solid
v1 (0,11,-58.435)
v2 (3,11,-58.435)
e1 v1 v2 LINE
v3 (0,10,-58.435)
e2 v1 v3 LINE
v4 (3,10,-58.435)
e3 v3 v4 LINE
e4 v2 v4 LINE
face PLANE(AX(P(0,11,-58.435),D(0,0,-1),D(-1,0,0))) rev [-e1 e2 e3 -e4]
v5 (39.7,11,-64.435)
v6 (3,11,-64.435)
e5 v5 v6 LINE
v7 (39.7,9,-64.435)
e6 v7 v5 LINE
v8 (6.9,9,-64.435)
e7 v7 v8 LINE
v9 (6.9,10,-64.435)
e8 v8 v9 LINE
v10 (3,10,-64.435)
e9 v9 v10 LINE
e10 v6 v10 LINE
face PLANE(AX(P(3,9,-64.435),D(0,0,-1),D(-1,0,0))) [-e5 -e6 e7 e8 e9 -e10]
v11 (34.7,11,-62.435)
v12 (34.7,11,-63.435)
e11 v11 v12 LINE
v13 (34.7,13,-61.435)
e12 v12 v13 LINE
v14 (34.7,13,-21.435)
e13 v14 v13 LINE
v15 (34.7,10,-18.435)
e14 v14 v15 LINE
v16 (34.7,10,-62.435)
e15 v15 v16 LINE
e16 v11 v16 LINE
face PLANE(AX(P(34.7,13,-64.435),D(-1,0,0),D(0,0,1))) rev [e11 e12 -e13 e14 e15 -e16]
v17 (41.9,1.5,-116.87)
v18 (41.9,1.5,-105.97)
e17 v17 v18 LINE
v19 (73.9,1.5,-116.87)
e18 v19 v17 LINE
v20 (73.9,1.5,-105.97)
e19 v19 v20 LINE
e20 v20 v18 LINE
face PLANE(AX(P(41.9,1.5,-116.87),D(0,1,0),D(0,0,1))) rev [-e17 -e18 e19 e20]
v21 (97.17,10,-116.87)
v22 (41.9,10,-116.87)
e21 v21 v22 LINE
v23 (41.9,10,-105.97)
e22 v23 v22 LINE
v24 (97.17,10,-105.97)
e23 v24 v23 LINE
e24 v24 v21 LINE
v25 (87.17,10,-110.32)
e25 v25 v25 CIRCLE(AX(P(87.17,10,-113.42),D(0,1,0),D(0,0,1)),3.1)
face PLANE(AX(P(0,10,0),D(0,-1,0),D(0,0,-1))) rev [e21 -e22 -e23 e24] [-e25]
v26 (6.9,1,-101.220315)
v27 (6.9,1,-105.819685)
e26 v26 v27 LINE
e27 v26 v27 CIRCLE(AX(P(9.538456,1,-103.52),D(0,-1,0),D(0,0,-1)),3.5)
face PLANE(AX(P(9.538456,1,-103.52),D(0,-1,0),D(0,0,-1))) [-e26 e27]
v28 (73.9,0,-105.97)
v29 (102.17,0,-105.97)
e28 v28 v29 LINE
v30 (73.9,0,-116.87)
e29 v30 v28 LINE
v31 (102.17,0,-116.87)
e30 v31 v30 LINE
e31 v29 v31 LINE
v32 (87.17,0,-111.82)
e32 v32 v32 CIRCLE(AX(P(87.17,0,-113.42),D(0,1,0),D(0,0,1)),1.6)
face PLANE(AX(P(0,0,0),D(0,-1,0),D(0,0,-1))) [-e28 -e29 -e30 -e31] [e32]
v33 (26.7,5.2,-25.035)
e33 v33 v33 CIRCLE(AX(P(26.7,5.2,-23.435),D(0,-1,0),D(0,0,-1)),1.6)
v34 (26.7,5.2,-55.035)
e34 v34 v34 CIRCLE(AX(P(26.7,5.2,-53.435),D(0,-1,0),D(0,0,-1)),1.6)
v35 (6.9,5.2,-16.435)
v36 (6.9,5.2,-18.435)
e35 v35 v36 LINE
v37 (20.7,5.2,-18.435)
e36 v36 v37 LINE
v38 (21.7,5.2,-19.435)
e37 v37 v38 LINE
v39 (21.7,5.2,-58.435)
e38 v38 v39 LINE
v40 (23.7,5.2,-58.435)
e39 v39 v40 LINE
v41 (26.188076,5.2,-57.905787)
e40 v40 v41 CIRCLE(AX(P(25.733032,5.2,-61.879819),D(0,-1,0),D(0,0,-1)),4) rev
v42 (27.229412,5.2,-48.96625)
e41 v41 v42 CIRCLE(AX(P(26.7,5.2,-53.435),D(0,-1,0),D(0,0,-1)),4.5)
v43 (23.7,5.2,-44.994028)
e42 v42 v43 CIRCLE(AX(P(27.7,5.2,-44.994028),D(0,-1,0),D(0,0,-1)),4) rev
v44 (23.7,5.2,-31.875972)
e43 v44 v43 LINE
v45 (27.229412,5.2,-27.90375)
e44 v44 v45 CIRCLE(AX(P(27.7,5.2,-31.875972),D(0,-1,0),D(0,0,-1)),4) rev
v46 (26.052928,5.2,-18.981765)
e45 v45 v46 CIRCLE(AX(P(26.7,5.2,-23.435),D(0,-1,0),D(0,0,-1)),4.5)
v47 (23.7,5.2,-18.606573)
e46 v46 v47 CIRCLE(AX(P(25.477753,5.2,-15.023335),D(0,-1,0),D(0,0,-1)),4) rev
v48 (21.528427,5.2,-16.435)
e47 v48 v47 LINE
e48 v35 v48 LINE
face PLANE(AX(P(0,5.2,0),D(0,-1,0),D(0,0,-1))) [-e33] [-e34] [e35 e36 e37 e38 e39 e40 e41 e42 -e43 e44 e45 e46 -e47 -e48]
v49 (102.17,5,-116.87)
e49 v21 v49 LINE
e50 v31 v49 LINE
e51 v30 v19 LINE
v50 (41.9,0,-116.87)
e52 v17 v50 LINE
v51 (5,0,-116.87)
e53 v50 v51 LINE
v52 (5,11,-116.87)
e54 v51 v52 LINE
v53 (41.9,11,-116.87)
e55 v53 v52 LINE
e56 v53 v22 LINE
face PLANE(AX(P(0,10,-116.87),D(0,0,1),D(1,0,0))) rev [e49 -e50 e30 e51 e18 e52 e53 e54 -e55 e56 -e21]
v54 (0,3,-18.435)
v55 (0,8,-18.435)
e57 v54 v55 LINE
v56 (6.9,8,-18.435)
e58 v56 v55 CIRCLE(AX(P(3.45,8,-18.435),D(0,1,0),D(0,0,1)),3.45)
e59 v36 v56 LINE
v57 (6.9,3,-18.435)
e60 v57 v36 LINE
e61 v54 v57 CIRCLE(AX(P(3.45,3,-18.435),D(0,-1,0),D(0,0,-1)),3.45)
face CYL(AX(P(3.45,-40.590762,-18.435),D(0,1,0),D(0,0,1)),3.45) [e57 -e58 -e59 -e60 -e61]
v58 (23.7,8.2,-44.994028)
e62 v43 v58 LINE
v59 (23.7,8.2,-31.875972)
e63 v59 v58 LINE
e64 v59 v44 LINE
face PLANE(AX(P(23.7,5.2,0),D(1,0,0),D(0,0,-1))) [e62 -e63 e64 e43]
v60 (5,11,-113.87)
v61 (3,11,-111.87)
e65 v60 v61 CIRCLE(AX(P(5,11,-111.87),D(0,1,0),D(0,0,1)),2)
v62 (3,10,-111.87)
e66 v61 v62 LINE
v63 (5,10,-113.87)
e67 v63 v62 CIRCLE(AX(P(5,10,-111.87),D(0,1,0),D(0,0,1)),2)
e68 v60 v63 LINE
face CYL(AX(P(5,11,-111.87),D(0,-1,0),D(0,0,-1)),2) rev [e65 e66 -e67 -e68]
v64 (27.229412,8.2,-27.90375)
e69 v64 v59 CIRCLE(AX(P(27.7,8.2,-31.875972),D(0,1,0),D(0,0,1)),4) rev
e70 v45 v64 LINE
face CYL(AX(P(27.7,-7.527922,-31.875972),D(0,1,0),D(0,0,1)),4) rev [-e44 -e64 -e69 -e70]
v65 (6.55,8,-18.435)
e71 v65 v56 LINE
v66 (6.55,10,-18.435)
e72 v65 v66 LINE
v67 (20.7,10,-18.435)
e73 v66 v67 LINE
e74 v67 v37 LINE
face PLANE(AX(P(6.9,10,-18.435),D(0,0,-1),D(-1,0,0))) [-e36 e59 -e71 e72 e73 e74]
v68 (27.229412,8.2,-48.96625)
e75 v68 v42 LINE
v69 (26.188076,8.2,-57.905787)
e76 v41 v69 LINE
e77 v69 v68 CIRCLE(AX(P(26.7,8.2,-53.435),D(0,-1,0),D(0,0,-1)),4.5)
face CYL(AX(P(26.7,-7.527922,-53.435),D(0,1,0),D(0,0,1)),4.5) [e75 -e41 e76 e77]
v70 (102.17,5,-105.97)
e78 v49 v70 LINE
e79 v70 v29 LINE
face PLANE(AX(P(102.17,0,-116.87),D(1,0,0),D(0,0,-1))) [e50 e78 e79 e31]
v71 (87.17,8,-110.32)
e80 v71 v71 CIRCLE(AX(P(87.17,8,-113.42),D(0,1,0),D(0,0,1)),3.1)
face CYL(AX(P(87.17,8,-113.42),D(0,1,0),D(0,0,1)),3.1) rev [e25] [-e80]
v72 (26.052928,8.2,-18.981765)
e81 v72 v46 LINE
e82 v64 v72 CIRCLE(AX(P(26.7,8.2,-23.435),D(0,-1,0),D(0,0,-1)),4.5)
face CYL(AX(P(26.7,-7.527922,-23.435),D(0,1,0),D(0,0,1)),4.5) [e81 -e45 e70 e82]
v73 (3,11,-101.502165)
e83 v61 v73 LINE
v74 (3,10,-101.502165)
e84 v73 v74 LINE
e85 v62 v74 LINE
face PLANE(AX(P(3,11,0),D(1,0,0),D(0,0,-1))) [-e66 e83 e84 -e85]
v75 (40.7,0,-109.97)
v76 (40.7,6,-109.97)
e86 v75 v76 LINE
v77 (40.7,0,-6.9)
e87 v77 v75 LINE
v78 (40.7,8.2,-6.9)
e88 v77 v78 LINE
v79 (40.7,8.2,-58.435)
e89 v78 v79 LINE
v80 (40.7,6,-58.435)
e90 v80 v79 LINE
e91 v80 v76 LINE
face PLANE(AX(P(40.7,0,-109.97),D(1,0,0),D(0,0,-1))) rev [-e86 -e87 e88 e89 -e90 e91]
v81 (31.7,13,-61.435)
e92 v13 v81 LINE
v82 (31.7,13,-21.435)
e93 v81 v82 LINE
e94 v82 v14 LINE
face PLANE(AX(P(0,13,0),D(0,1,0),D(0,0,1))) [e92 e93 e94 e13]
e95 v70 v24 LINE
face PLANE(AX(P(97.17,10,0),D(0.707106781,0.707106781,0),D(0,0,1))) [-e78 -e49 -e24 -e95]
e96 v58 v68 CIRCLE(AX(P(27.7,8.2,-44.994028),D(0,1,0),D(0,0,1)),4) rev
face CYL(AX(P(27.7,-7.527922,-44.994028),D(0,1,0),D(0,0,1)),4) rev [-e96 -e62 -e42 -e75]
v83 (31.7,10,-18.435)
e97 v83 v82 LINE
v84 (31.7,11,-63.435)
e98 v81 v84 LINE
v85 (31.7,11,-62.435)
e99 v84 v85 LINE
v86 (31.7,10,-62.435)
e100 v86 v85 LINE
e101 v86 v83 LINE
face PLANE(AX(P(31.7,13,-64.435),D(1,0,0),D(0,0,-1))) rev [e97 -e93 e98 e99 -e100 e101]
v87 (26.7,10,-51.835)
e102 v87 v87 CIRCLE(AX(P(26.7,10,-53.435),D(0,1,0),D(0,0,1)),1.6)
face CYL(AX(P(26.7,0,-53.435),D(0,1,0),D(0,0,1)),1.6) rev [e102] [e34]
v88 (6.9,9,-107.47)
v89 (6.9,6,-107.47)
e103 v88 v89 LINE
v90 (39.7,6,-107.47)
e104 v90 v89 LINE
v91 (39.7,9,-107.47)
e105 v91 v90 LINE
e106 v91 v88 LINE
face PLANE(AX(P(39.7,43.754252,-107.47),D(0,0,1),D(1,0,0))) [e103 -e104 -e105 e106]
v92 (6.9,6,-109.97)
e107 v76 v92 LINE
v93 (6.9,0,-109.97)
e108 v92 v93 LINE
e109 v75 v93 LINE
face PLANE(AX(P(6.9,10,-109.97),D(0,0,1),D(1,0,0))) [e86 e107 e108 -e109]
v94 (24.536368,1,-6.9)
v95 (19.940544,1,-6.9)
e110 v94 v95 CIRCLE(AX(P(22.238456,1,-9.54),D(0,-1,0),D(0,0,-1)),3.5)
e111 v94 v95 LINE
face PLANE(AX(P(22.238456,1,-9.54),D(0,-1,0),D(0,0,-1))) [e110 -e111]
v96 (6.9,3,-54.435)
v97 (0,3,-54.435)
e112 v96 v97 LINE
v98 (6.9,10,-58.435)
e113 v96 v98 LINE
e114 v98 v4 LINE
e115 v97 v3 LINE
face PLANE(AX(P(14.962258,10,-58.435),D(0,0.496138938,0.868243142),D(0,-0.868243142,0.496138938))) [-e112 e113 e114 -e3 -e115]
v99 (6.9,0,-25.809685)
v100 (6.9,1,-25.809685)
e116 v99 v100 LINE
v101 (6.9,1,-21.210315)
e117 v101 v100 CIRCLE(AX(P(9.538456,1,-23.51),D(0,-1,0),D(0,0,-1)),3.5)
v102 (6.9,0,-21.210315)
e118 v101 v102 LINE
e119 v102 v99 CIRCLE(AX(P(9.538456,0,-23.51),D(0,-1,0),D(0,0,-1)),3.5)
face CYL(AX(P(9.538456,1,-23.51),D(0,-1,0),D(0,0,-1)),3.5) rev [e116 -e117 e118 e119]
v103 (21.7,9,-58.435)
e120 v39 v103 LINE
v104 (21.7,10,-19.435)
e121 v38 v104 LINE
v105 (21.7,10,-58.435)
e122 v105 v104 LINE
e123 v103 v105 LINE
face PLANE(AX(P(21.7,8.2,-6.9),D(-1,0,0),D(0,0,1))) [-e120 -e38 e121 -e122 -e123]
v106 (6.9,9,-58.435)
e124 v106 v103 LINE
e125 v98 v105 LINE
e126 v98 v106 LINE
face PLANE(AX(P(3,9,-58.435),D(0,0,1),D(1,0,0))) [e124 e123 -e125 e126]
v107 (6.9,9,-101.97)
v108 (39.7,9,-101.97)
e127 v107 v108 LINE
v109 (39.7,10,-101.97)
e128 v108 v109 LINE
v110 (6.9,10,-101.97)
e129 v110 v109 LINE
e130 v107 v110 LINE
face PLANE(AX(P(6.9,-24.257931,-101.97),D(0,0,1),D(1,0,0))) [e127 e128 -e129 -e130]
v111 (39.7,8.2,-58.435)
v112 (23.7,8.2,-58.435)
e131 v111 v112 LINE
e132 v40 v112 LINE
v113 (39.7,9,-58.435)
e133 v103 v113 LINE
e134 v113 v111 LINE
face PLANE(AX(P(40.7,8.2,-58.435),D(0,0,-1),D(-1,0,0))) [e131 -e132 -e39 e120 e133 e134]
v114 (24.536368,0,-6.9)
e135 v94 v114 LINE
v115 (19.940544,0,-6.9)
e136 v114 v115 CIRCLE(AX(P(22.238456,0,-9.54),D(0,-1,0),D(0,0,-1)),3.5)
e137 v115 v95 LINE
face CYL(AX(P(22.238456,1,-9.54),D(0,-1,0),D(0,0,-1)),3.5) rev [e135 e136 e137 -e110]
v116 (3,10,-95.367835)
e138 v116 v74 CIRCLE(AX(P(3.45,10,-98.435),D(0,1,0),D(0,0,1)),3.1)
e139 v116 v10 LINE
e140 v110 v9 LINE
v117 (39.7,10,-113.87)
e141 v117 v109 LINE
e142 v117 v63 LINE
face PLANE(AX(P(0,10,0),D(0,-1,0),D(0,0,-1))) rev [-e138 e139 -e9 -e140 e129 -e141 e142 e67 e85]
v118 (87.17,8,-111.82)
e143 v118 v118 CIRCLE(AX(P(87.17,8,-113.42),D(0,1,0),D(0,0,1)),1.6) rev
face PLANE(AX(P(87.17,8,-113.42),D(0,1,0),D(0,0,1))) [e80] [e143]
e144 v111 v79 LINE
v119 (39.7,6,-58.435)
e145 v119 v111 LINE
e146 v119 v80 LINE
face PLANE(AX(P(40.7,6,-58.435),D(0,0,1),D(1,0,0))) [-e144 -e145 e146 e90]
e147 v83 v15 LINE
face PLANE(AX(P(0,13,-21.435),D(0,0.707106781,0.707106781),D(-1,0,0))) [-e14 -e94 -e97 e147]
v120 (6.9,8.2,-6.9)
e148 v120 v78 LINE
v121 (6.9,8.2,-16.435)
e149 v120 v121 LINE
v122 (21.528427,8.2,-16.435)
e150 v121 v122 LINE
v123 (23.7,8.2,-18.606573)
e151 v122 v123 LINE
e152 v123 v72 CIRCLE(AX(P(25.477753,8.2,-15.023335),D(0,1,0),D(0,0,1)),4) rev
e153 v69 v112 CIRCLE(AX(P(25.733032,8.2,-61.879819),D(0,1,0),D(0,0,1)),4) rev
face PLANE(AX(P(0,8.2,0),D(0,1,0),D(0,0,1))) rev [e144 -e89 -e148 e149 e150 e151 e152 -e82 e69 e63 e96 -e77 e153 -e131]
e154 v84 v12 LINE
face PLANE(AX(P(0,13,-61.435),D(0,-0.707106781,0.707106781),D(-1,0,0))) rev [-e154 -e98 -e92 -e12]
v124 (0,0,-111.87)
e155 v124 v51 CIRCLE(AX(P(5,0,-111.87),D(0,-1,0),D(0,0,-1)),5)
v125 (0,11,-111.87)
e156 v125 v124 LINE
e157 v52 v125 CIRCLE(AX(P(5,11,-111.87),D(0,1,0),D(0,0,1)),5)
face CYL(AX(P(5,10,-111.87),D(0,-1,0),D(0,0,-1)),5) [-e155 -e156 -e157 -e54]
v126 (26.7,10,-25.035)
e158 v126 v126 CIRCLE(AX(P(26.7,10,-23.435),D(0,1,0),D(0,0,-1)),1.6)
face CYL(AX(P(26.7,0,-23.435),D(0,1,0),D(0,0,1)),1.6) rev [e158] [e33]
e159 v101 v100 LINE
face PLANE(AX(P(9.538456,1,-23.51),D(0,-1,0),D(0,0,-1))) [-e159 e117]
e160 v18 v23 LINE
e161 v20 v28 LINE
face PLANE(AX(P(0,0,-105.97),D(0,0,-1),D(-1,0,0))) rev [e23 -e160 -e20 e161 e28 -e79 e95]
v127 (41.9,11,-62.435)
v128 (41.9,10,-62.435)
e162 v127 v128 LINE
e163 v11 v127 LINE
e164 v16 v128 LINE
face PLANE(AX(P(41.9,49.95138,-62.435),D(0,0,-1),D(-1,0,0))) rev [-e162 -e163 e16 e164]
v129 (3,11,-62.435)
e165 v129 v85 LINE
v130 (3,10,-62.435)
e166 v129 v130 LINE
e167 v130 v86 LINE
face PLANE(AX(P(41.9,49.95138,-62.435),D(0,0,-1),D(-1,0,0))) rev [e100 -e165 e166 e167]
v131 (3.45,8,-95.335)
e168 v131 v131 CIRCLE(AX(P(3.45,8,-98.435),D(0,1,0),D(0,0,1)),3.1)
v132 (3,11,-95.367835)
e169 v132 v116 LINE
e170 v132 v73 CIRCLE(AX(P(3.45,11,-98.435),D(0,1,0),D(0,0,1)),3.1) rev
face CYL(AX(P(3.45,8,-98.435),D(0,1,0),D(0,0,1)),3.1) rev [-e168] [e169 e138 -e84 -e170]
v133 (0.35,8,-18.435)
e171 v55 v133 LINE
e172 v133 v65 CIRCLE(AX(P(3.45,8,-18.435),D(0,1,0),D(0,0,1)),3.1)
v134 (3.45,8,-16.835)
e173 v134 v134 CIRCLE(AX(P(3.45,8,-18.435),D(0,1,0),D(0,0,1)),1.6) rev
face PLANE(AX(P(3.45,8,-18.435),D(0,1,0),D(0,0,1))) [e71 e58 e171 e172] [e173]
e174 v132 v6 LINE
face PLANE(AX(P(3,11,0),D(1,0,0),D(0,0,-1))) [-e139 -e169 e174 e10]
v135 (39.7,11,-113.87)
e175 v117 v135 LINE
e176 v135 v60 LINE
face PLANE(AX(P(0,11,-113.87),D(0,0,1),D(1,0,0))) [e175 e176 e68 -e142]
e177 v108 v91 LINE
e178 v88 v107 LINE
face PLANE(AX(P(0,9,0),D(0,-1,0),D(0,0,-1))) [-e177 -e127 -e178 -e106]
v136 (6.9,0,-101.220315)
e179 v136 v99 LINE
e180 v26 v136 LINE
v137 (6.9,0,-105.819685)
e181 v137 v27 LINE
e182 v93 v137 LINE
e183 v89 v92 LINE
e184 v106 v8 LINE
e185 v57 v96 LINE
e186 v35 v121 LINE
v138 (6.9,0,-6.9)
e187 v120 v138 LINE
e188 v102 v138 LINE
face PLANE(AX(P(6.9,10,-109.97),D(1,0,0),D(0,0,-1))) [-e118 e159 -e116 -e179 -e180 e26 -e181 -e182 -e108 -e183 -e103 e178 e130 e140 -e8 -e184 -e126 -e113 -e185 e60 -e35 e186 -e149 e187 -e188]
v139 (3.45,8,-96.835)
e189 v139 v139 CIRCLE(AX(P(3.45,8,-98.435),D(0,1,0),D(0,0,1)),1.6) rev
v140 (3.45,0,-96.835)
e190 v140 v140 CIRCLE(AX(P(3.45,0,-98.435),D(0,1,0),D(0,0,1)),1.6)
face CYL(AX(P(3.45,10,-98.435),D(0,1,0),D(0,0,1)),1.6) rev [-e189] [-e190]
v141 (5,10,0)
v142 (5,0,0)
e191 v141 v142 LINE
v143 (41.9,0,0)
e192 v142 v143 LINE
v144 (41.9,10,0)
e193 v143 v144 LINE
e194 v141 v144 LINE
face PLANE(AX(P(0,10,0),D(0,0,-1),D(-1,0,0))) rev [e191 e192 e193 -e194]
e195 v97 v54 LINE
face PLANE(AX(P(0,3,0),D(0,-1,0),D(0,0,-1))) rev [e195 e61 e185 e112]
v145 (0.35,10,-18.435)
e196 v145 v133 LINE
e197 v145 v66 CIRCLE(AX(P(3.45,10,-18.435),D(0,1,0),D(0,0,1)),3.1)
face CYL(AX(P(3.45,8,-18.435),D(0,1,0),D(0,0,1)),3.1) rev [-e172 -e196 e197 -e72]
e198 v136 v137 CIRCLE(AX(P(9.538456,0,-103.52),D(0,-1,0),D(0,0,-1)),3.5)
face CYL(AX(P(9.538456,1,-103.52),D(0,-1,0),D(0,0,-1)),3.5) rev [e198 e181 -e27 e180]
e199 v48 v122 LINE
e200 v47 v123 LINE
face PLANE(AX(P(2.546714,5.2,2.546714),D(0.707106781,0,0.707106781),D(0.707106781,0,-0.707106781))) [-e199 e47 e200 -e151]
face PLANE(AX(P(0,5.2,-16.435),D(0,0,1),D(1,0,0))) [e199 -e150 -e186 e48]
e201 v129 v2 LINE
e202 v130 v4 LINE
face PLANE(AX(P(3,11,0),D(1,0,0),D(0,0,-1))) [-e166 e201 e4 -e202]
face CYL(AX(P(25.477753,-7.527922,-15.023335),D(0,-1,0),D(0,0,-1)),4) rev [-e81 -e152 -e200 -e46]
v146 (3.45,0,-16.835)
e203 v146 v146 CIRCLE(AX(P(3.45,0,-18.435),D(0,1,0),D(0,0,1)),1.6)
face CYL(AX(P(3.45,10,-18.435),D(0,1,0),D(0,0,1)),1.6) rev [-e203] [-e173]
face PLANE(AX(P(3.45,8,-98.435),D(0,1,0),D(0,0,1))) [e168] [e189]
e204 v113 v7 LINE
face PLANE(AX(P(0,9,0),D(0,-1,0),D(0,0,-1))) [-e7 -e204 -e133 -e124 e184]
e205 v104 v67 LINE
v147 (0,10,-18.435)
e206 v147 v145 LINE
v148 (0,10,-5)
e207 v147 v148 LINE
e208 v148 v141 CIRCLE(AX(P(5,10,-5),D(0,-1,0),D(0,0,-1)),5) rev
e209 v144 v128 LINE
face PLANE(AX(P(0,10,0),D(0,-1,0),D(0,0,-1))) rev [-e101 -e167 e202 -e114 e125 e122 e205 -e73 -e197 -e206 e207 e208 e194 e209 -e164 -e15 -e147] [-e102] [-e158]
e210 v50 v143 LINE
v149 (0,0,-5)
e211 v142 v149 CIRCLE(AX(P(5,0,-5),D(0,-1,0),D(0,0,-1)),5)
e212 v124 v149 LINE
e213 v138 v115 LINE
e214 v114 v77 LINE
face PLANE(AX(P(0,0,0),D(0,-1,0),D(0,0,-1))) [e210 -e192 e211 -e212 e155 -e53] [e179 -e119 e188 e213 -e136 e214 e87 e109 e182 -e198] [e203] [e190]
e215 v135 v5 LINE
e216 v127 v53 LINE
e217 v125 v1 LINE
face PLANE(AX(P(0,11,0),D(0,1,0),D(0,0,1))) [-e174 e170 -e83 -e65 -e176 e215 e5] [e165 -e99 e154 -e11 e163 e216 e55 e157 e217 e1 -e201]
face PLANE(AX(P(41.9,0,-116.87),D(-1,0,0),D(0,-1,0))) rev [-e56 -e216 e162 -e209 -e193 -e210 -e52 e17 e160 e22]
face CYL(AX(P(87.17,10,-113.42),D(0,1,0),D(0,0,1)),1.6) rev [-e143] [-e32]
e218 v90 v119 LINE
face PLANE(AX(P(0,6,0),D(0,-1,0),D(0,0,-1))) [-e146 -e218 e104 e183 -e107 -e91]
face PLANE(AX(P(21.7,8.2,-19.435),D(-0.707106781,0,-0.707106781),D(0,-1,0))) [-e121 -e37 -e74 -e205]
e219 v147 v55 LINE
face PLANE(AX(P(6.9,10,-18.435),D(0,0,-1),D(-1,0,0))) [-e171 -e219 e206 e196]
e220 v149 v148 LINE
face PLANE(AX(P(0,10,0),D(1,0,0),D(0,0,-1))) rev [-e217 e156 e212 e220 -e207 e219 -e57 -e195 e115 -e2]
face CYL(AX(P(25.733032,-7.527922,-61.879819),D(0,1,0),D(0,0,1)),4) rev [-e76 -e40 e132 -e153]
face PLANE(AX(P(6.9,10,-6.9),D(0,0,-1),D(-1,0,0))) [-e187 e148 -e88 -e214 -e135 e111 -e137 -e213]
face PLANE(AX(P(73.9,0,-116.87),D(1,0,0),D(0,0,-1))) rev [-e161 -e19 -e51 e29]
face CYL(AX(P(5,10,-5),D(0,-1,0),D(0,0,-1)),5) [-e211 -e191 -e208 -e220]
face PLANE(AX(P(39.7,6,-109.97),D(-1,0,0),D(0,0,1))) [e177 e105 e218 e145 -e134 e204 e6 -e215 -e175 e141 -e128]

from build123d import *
from build123d.topology import SkipClean

# Parameters (mm, degrees)
SKETCH_1_W              = 337.35
SKETCH_1_H              = 116.87
SKETCH_1_W_2            = 324.05
SKETCH_1_H_2            = 103.07
EXTRUDE_1_DEPTH         = 10
FILLET_1_R              = 5
HOLE_WIZARD_3_2_3_2_1_D = 3.2
SKETCH_5_W              = 32
SKETCH_5_H              = 1.5
CUT_EXTRUDE_1_DEPTH     = 355.962566195
EXTRUDE_2_REACH         = 356.963
SKETCH_6_W              = 3
SKETCH_6_H              = 10
SKETCH_7_W              = 257.05
SKETCH_7_H              = 10
EXTRUDE_3_DEPTH         = 4
SKETCH_8_W              = 257.05
SKETCH_8_H              = 4
EXTRUDE_4_DEPTH         = 3
SKETCH_11_W             = 99.07
SKETCH_11_H             = 13
EXTRUDE_5_DEPTH         = 2
SKETCH_13_W             = 42
SKETCH_13_H             = 6.5
CUT_EXTRUDE_2_DEPTH     = 354.743782136
SKETCH_14_W             = 121.5
SKETCH_14_H             = 3.5
CUT_EXTRUDE_3_DEPTH     = 355.962566195
SKETCH_16_W             = 32
SKETCH_16_H             = 8.5
EXTRUDE_7_DEPTH         = 4
SKETCH_17_W             = 103.07
SKETCH_17_H             = 3
CUT_EXTRUDE_4_DEPTH     = 0.1
EXTRUDE_8_DEPTH         = 2
SKETCH_19_W             = 70.55
SKETCH_19_H             = 2
SKETCH_19_W_2           = 95
EXTRUDE_9_DEPTH         = 3
SKETCH_20_R             = 3.5
CUT_EXTRUDE_5_DEPTH     = 4
SKETCH_21_R             = 3.1
CUT_EXTRUDE_6_DEPTH     = 2
SKETCH_24_W             = 103.07
SKETCH_24_H             = 3
CUT_EXTRUDE_8_DEPTH     = 358.160495296
SKETCH_26_W             = 675.8738904
SKETCH_26_H             = 351.874844901
CUT_EXTRUDE_9_DEPTH     = 358.160495296
SKETCH_27_W             = 1.8
SKETCH_27_H             = 103.07
CUT_EXTRUDE_10_DEPTH    = 156.554832133
CUT_EXTRUDE_11_DEPTH    = 7
SKETCH_30_W             = 6.9
SKETCH_30_H             = 3.45
CUT_EXTRUDE_12_DEPTH    = 2
SKETCH_31_W             = 19
SKETCH_31_H             = 51.535
EXTRUDE_10_DEPTH        = 1.8
CHAMFER_2_SIZE          = 1
SKETCH_32_W             = 14.8
SKETCH_32_H             = 11.535
EXTRUDE_11_DEPTH        = 1.8
CHAMFER_1_SIZE          = 5
CHAMFER_3_SIZE          = 1
EXTRUDE_12_DEPTH        = 6.9
EXTRUDE_13_DEPTH        = 3
EXTRUDE_START           = 1
EXTRUDE_14_DEPTH        = 1
SKETCH_36_W             = 1
SKETCH_36_H             = 51.535
EXTRUDE_15_DEPTH        = 4
SKETCH_37_W             = 33.661543988
SKETCH_37_H             = 2.5
EXTRUDE_16_DEPTH        = 4
SKETCH_38_W             = 36.7
SKETCH_38_H             = 6
EXTRUDE_18_DEPTH        = 1
SKETCH_39_W             = 32.8
SKETCH_39_H             = 5.5
EXTRUDE_19_DEPTH        = 1
SKETCH_40_R             = 1.6
CUT_EXTRUDE_13_DEPTH    = 156.554832133
SKETCH_41_R             = 4.5
SKETCH_41_R_2           = 1.6
EXTRUDE_20_DEPTH        = 3
FILLET_2_R              = 4
SKETCH_42_W             = 3
SKETCH_42_H             = 46
EXTRUDE_21_DEPTH        = 3
CHAMFER_4_SIZE          = 3
SKETCH_43_W             = 2.2
SKETCH_43_H             = 52.435
EXTRUDE_22_DEPTH        = 1
SKETCH_44_W             = 38.9
SKETCH_44_H             = 2
EXTRUDE_23_DEPTH        = 1


# Some blends are built 0.0001 mm under size
with BuildPart() as part:
    # 草图1 → 凸台-拉伸1 (new body)
    with BuildSketch(Plane(origin=(0, 0, 0), x_dir=(1, 0, 0), z_dir=(0, 1, 0))):
        with Locations((168.675, 58.435)):
            Rectangle(SKETCH_1_W, SKETCH_1_H)
        with Locations((168.925, 58.435)):
            Rectangle(SKETCH_1_W_2, SKETCH_1_H_2, mode=Mode.SUBTRACT)
    extrude(amount=EXTRUDE_1_DEPTH)

    # 圆角1
    fillet_1_edges = [part.edges().sort_by_distance(p)[0] for p in [
        (0, 5, -116.87),
        (337.35, 5, -116.87),
        (337.35, 5, 0),
        (0, 5, 0),
    ]]
    fillet(fillet_1_edges, radius=FILLET_1_R)

    # Ø3.2 (3.2) 直径孔1 (through all)
    with Locations(Plane(origin=(0, 10, 0), x_dir=(1, 0, 0), z_dir=(0, 1, 0))):
        with Locations((3.45, 98.435), (87.17, 113.42), (247.17, 113.42), (334.15, 98.435), (334.15, 18.435), (247.17, 3.45), (87.17, 3.45), (3.45, 18.435)):
            Hole(HOLE_WIZARD_3_2_3_2_1_D / 2)

    # 草图5 → 切除-拉伸1 (cut, through all)
    with BuildSketch(Plane.XY.offset(-109.97)):
        with Locations((57.9, 0.75)):
            Rectangle(SKETCH_5_W, SKETCH_5_H)
    extrude(amount=-CUT_EXTRUDE_1_DEPTH, mode=Mode.SUBTRACT)

    # 草图6 → 凸台-拉伸2 (add, up to next)
    with BuildSketch(Plane.XY.offset(-109.97), mode=Mode.PRIVATE) as extrude_2_sk1:
        with Locations((40.4, 5)):
            Rectangle(SKETCH_6_W, SKETCH_6_H)
    extrude_2_tool1 = extrude(extrude_2_sk1.sketch, amount=EXTRUDE_2_REACH, mode=Mode.PRIVATE) - part.part
    add(extrude_2_tool1.solids().sort_by_distance((40.4, 5, -109.97))[0])

    # 草图7 → 凸台-拉伸3 (add)
    with BuildSketch(Plane.XY.offset(-109.97)):
        with Locations((202.425, 5)):
            Rectangle(SKETCH_7_W, SKETCH_7_H)
    extrude(amount=EXTRUDE_3_DEPTH)

    # 草图8 → 凸台-拉伸4 (add)
    with BuildSketch(Plane.XZ):
        with Locations((202.425, -107.97)):
            Rectangle(SKETCH_8_W, SKETCH_8_H)
    extrude(amount=EXTRUDE_4_DEPTH)

    # 草图11 → 凸台-拉伸5 (add)
    with BuildSketch(Plane.ZY.offset(-330.95)):
        with Locations((-56.435, 3.5)):
            Rectangle(SKETCH_11_W, SKETCH_11_H)
    extrude(amount=EXTRUDE_5_DEPTH)

    # 草图13 → 切除-拉伸2 (cut, through all)
    with BuildSketch(Plane.XY.offset(-105.97)):
        with Locations((307.95, 0.25)):
            Rectangle(SKETCH_13_W, SKETCH_13_H)
    extrude(amount=-CUT_EXTRUDE_2_DEPTH, mode=Mode.SUBTRACT)

    # 草图14 → 切除-拉伸3 (cut, through all)
    with BuildSketch(Plane(origin=(0, 0, -6.9), x_dir=(-1, 0, 0), z_dir=(0, 0, -1))):
        with Locations((-173.2, 1.75)):
            Rectangle(SKETCH_14_W, SKETCH_14_H)
    extrude(amount=-CUT_EXTRUDE_3_DEPTH, mode=Mode.SUBTRACT)

    # 草图16 → 凸台-拉伸7 (add)
    with BuildSketch(Plane.XY.offset(-109.97)):
        with Locations((57.9, 5.75)):
            Rectangle(SKETCH_16_W, SKETCH_16_H)
    extrude(amount=EXTRUDE_7_DEPTH)

    # 草图17 → 切除-拉伸4 (cut)
    with BuildSketch(Plane(origin=(330.95, 0, 0), x_dir=(0, 0, -1), z_dir=(1, 0, 0))):
        with Locations((58.435, -1.5)):
            Rectangle(SKETCH_17_W, SKETCH_17_H)
    extrude(amount=-CUT_EXTRUDE_4_DEPTH, mode=Mode.SUBTRACT)

    # 草图18 → 凸台-拉伸8 (add)
    with BuildSketch(Plane(origin=(0, 0, -6.9), x_dir=(-1, 0, 0), z_dir=(0, 0, -1))):
        Polygon((-233.95, 0), (-233.95, 3.5), (-112.45, 3.5), (-112.45, 0), (-41.9, 0), (-41.9, 10), (-328.95, 10), (-328.95, 0), align=None)
    extrude(amount=EXTRUDE_8_DEPTH)

    # 草图19 → 凸台-拉伸9 (add)
    with BuildSketch(Plane.XZ):
        with Locations((77.175, -7.9)):
            Rectangle(SKETCH_19_W, SKETCH_19_H)
        with Locations((281.45, -7.9)):
            Rectangle(SKETCH_19_W_2, SKETCH_19_H)
    extrude(amount=EXTRUDE_9_DEPTH)

    # 草图20 → 切除-拉伸5 (cut)
    with BuildSketch(Plane.XZ.offset(3)):
        with Locations((92.088456012, -9.54)):
            Circle(SKETCH_20_R)
        with Locations((262.268456012, -9.54)):
            Circle(SKETCH_20_R)
        with Locations((328.308456012, -13.35)):
            Circle(SKETCH_20_R)
        with Locations((328.308456012, -74.31)):
            Circle(SKETCH_20_R)
        with Locations((137.808456012, -107.33)):
            Circle(SKETCH_20_R)
        with Locations((22.238456012, -9.54)):
            Circle(SKETCH_20_R)
        with Locations((9.538456012, -23.51)):
            Circle(SKETCH_20_R)
        with Locations((9.538456012, -103.52)):
            Circle(SKETCH_20_R)
    extrude(amount=-CUT_EXTRUDE_5_DEPTH, mode=Mode.SUBTRACT)

    # 草图21 → 切除-拉伸6 (cut)
    with BuildSketch(Plane(origin=(0, 10, 0), x_dir=(1, 0, 0), z_dir=(0, 1, 0))):
        with Locations(Location((87.17, 113.42, 0), (0, 0, 270))):
            Circle(SKETCH_21_R)
        with Locations(Location((247.17, 113.42, 0), (0, 0, 270))):
            Circle(SKETCH_21_R)
        with Locations(Location((334.15, 98.435, 0), (0, 0, 270))):
            Circle(SKETCH_21_R)
        with Locations(Location((334.15, 18.435, 0), (0, 0, 270))):
            Circle(SKETCH_21_R)
        with Locations(Location((247.17, 3.45, 0), (0, 0, 270))):
            Circle(SKETCH_21_R)
        with Locations(Location((87.17, 3.45, 0), (0, 0, 270))):
            Circle(SKETCH_21_R)
        with Locations(Location((3.45, 18.435, 0), (0, 0, 270))):
            Circle(SKETCH_21_R)
        with Locations(Location((3.45, 98.435, 0), (0, 0, 270))):
            Circle(SKETCH_21_R)
    extrude(amount=-CUT_EXTRUDE_6_DEPTH, mode=Mode.SUBTRACT)

    # 草图24 → 切除-拉伸8 (cut, through all)
    with BuildSketch(Plane(origin=(337.35, 0, 0), x_dir=(0, 0, -1), z_dir=(1, 0, 0))):
        with Locations((58.435, -1.5)):
            Rectangle(SKETCH_24_W, SKETCH_24_H)
    extrude(amount=-CUT_EXTRUDE_8_DEPTH, mode=Mode.SUBTRACT)

    # 草图26 → 切除-拉伸9 (cut, through all)
    with BuildSketch(Plane(origin=(0, 10, 0), x_dir=(1, 0, 0), z_dir=(0, 1, 0))):
        with Locations((186.884533427, 86.899688896)):
            Rectangle(SKETCH_26_W, SKETCH_26_H)
        Polygon((0, 116.87), (102.17, 116.87), (102.17, 8.9), (41.9, 8.9), (41.9, 0), (0, 0), align=None, mode=Mode.SUBTRACT)
    extrude(amount=-CUT_EXTRUDE_9_DEPTH, mode=Mode.SUBTRACT)

    # 草图27 → 切除-拉伸10 (cut, through all)
    with BuildSketch(Plane(origin=(0, 10, 0), x_dir=(1, 0, 0), z_dir=(0, 1, 0))):
        with Locations((39.8, 58.435)):
            Rectangle(SKETCH_27_W, SKETCH_27_H)
    extrude(amount=-CUT_EXTRUDE_10_DEPTH, mode=Mode.SUBTRACT)

    # 草图28 → 切除-拉伸11 (cut)
    with BuildSketch(Plane(origin=(0, 10, 0), x_dir=(1, 0, 0), z_dir=(0, 1, 0))):
        with BuildLine():
            Line((0, 58.435), (6.9, 58.435))
            Line((6.9, 58.435), (6.9, 18.435))
            ThreePointArc((6.9, 18.435), (3.45, 21.885), (0, 18.435))
            Line((0, 18.435), (0, 58.435))
        make_face()
    extrude(amount=-CUT_EXTRUDE_11_DEPTH, mode=Mode.SUBTRACT)

    # 草图30 → 切除-拉伸12 (cut)
    with BuildSketch(Plane(origin=(0, 8, 0), x_dir=(1, 0, 0), z_dir=(0, 1, 0))):
        with Locations((3.45, 20.16)):
            Rectangle(SKETCH_30_W, SKETCH_30_H)
    extrude(amount=CUT_EXTRUDE_12_DEPTH, mode=Mode.SUBTRACT)

    # 草图31 → 凸台-拉伸10 (add)
    with BuildSketch(Plane(origin=(0, 10, 0), x_dir=(1, 0, 0), z_dir=(0, 1, 0))):
        with Locations((31.2, 32.6675)):
            Rectangle(SKETCH_31_W, SKETCH_31_H)
    extrude(amount=-EXTRUDE_10_DEPTH)

    # 倒角2
    chamfer_2_edges = [part.edges().sort_by_distance(p)[0] for p in [
        (40.7, 9.1, -58.435),
    ]]
    chamfer(chamfer_2_edges, length=CHAMFER_2_SIZE)

    # 草图32 → 凸台-拉伸11 (add)
    with BuildSketch(Plane(origin=(0, 10, 0), x_dir=(1, 0, 0), z_dir=(0, 1, 0))):
        with Locations((14.3, 12.6675)):
            Rectangle(SKETCH_32_W, SKETCH_32_H)
    extrude(amount=-EXTRUDE_11_DEPTH)

    # 倒角1
    chamfer_1_edges = [part.edges().sort_by_distance(p)[0] for p in [
        (102.17, 10, -111.42),
    ]]
    chamfer(chamfer_1_edges, length=CHAMFER_1_SIZE)

    # 倒角3
    chamfer_3_edges = [part.edges().sort_by_distance(p)[0] for p in [
        (21.7, 9.1, -18.435),
    ]]
    chamfer(chamfer_3_edges, length=CHAMFER_3_SIZE)

    # 草图33 → 凸台-拉伸12 (add)
    with BuildSketch(Plane.ZY):
        Polygon((-58.435, 10), (-54.435, 3), (-58.435, 3), align=None)
    extrude(amount=-EXTRUDE_12_DEPTH)

    # 草图34 → 凸台-拉伸13 (add)
    with BuildSketch(Plane.XZ.offset(-8.2)):
        Polygon((21.528427125, -16.435), (6.9, -16.435), (6.9, -18.435), (20.7, -18.435), (21.7, -19.435), (21.7, -58.435), (23.7, -58.435), (23.7, -18.606572875), align=None)
    extrude(amount=EXTRUDE_13_DEPTH)

    # 草图35 → 凸台-拉伸14 (add)
    with SkipClean():  # the faces are left unmerged after this step: merging them gives an invalid solid
        with BuildSketch(Plane(origin=(0, 10, 0), x_dir=(1, 0, 0), z_dir=(0, 1, 0)).offset(EXTRUDE_START)):
            with BuildLine():
                ThreePointArc((5, 116.87), (1.464466094, 115.405533906), (0, 111.87))
                Line((0, 111.87), (0, 58.435))
                Line((0, 58.435), (3, 58.435))
                Line((3, 58.435), (3, 95.367835185))
                ThreePointArc((3, 95.367835185), (0.35, 98.435), (3, 101.502164815))
                Line((3, 101.502164815), (3, 111.87))
                ThreePointArc((3, 111.87), (3.585786438, 113.284213562), (5, 113.87))
                Line((5, 113.87), (41.9, 113.87))
                Line((41.9, 113.87), (41.9, 116.87))
                Line((41.9, 116.87), (5, 116.87))
            make_face()
        extrude(amount=-EXTRUDE_14_DEPTH)

    # 草图36 → 凸台-拉伸15 (add)
    with BuildSketch(Plane(origin=(0, 10, 0), x_dir=(1, 0, 0), z_dir=(0, 1, 0))):
        with Locations((40.2, 84.2025)):
            Rectangle(SKETCH_36_W, SKETCH_36_H)
    extrude(amount=-EXTRUDE_15_DEPTH)

    # 草图37 → 凸台-拉伸16 (add)
    with SkipClean():  # the faces are left unmerged after this step: merging them gives an invalid solid
        with BuildSketch(Plane.XZ.offset(-6)):
            with Locations((22.869228006, -108.72)):
                Rectangle(SKETCH_37_W, SKETCH_37_H)
        extrude(amount=-EXTRUDE_16_DEPTH)

    # 草图38 → 凸台-拉伸18 (add)
    with BuildSketch(Plane(origin=(0, 10, 0), x_dir=(1, 0, 0), z_dir=(0, 1, 0))):
        with Locations((21.35, 61.435)):
            Rectangle(SKETCH_38_W, SKETCH_38_H)
    extrude(amount=-EXTRUDE_18_DEPTH)

    # 草图39 → 凸台-拉伸19 (add)
    with SkipClean():  # the faces are left unmerged after this step: merging them gives an invalid solid
        with BuildSketch(Plane(origin=(0, 10, 0), x_dir=(1, 0, 0), z_dir=(0, 1, 0))):
            with Locations((23.3, 104.72)):
                Rectangle(SKETCH_39_W, SKETCH_39_H)
        extrude(amount=-EXTRUDE_19_DEPTH)

    # 草图40 → 切除-拉伸13 (cut, through all)
    with SkipClean():  # the faces are left unmerged after this step: merging them gives an invalid solid
        with BuildSketch(Plane(origin=(0, 10, 0), x_dir=(1, 0, 0), z_dir=(0, 1, 0))):
            with Locations(Location((26.7, 53.435, 0), (0, 0, 270))):
                Circle(SKETCH_40_R)
            with Locations(Location((26.7, 23.435, 0), (0, 0, 270))):
                Circle(SKETCH_40_R)
        extrude(amount=-CUT_EXTRUDE_13_DEPTH, mode=Mode.SUBTRACT)

    # 草图41 → 凸台-拉伸20 (add)
    # profile 1 of 2: a face of its own
    with SkipClean():  # the faces are left unmerged after this step: merging them gives an invalid solid
        with BuildSketch(Plane.XZ.offset(-8.2)):
            with Locations((26.7, -23.435)):
                Circle(SKETCH_41_R)
            with Locations(Location((26.7, -23.435, 0), (0, 0, 270))):
                Circle(SKETCH_41_R_2, mode=Mode.SUBTRACT)
        # profile 2 of 2: a face of its own
        with BuildSketch(Plane.XZ.offset(-8.2)):
            with Locations((26.7, -53.435)):
                Circle(SKETCH_41_R)
            with Locations(Location((26.7, -53.435, 0), (0, 0, 90))):
                Circle(SKETCH_41_R_2, mode=Mode.SUBTRACT)
        extrude(amount=EXTRUDE_20_DEPTH)

    # 圆角2
    # the kernel refuses this fillet: 4 mm, written as the material it adds along each edge
    with BuildSketch(Plane(origin=(23.7, 5.2, -56.789101966), x_dir=(0, 0, -1), z_dir=(0, 1, 0))) as fillet_2_piece_1:
        with BuildLine():
            CenterArc((5.090717348, -2.033032191), FILLET_2_R, 149.452131315, 37.080030589)
            Line((1.11668473, -2.488075866), (1.037204077, -2.497176739))
            ThreePointArc((1.037204077, -2.497176739), (0.678377965, -1.190164205), (-0.059628479, -0.053333333))
            Line((-0.059628479, -0.053333333), (0, 0.08))
            ThreePointArc((0, 0.08), (0.822949017, 0.08), (1.577001647, 0.040660644))
            Line((1.577001647, 0.040660644), (1.645898034, 0))
        make_face()
    extrude(amount=3)
    with BuildSketch(Plane(origin=(23.7, 5.2, -50.080898034), x_dir=(0, 0, 1), z_dir=(0, 1, 0))) as fillet_2_piece_2:
        with BuildLine():
            CenterArc((5.086869542, 4), FILLET_2_R, 186.756327031, 83.243672969)
            Line((1.114647656, 3.529411765), (1.035203218, 3.52))
            ThreePointArc((1.035203218, 3.52), (0.860700296, 1.668894486), (-0.059628479, 0.053333333))
            Line((-0.059628479, 0.053333333), (0, -0.08))
            Line((0, -0.08), (5.086869542, -0.08))
            Line((5.086869542, -0.08), (5.086869542, 0))
        make_face()
    extrude(amount=3)
    with BuildSketch(Plane(origin=(23.7, 5.2, -26.789101966), x_dir=(0, 0, -1), z_dir=(0, 1, 0))) as fillet_2_piece_3:
        with BuildLine():
            CenterArc((5.086869542, -4), FILLET_2_R, 90, 83.243672969)
            Line((1.114647656, -3.529411765), (1.035203218, -3.52))
            ThreePointArc((1.035203218, -3.52), (0.860700296, -1.668894486), (-0.059628479, -0.053333333))
            Line((-0.059628479, -0.053333333), (0, 0.08))
            Line((0, 0.08), (5.086869542, 0.08))
            Line((5.086869542, 0.08), (5.086869542, 0))
        make_face()
    extrude(amount=3)
    with BuildSketch(Plane(origin=(23.7, 5.2, -20.080898034), x_dir=(0, 0, 1), z_dir=(0, 1, 0))) as fillet_2_piece_4:
        with BuildLine():
            CenterArc((5.057563246, 1.777752742), FILLET_2_R, 171.732563224, 34.654836408)
            Line((1.099132558, 2.352927922), (1.019963944, 2.364431426))
            ThreePointArc((1.019963944, 2.364431426), (0.65051009, 1.129309678), (-0.059628479, 0.053333333))
            Line((-0.059628479, 0.053333333), (0, -0.08))
            ThreePointArc((0, -0.08), (0.737162579, -0.08), (1.402660397, -0.035555055))
            Line((1.402660397, -0.035555055), (1.474325158, 0))
        make_face()
    extrude(amount=3)

    # 草图42 → 凸台-拉伸21 (add)
    with BuildSketch(Plane(origin=(0, 10, 0), x_dir=(1, 0, 0), z_dir=(0, 1, 0))):
        with Locations((33.2, 41.435)):
            Rectangle(SKETCH_42_W, SKETCH_42_H)
    extrude(amount=EXTRUDE_21_DEPTH)

    # 倒角4
    chamfer_4_edges = [part.edges().sort_by_distance(p)[0] for p in [
        (33.2, 13, -18.435),
        (33.2, 13, -64.435),
    ]]
    chamfer(chamfer_4_edges, length=CHAMFER_4_SIZE - 0.0001)  # a hair under: the kernel refuses the full size

    # 草图43 → 凸台-拉伸22 (add)
    with BuildSketch(Plane(origin=(0, 10, 0), x_dir=(1, 0, 0), z_dir=(0, 1, 0))):
        with Locations((40.8, 90.6525)):
            Rectangle(SKETCH_43_W, SKETCH_43_H)
    extrude(amount=EXTRUDE_22_DEPTH)

    # 草图44 → 凸台-拉伸23 (add)
    with BuildSketch(Plane(origin=(0, 10, 0), x_dir=(1, 0, 0), z_dir=(0, 1, 0))):
        with Locations((22.45, 63.435)):
            Rectangle(SKETCH_44_W, SKETCH_44_H)
    extrude(amount=EXTRUDE_23_DEPTH)


solid = part.part
